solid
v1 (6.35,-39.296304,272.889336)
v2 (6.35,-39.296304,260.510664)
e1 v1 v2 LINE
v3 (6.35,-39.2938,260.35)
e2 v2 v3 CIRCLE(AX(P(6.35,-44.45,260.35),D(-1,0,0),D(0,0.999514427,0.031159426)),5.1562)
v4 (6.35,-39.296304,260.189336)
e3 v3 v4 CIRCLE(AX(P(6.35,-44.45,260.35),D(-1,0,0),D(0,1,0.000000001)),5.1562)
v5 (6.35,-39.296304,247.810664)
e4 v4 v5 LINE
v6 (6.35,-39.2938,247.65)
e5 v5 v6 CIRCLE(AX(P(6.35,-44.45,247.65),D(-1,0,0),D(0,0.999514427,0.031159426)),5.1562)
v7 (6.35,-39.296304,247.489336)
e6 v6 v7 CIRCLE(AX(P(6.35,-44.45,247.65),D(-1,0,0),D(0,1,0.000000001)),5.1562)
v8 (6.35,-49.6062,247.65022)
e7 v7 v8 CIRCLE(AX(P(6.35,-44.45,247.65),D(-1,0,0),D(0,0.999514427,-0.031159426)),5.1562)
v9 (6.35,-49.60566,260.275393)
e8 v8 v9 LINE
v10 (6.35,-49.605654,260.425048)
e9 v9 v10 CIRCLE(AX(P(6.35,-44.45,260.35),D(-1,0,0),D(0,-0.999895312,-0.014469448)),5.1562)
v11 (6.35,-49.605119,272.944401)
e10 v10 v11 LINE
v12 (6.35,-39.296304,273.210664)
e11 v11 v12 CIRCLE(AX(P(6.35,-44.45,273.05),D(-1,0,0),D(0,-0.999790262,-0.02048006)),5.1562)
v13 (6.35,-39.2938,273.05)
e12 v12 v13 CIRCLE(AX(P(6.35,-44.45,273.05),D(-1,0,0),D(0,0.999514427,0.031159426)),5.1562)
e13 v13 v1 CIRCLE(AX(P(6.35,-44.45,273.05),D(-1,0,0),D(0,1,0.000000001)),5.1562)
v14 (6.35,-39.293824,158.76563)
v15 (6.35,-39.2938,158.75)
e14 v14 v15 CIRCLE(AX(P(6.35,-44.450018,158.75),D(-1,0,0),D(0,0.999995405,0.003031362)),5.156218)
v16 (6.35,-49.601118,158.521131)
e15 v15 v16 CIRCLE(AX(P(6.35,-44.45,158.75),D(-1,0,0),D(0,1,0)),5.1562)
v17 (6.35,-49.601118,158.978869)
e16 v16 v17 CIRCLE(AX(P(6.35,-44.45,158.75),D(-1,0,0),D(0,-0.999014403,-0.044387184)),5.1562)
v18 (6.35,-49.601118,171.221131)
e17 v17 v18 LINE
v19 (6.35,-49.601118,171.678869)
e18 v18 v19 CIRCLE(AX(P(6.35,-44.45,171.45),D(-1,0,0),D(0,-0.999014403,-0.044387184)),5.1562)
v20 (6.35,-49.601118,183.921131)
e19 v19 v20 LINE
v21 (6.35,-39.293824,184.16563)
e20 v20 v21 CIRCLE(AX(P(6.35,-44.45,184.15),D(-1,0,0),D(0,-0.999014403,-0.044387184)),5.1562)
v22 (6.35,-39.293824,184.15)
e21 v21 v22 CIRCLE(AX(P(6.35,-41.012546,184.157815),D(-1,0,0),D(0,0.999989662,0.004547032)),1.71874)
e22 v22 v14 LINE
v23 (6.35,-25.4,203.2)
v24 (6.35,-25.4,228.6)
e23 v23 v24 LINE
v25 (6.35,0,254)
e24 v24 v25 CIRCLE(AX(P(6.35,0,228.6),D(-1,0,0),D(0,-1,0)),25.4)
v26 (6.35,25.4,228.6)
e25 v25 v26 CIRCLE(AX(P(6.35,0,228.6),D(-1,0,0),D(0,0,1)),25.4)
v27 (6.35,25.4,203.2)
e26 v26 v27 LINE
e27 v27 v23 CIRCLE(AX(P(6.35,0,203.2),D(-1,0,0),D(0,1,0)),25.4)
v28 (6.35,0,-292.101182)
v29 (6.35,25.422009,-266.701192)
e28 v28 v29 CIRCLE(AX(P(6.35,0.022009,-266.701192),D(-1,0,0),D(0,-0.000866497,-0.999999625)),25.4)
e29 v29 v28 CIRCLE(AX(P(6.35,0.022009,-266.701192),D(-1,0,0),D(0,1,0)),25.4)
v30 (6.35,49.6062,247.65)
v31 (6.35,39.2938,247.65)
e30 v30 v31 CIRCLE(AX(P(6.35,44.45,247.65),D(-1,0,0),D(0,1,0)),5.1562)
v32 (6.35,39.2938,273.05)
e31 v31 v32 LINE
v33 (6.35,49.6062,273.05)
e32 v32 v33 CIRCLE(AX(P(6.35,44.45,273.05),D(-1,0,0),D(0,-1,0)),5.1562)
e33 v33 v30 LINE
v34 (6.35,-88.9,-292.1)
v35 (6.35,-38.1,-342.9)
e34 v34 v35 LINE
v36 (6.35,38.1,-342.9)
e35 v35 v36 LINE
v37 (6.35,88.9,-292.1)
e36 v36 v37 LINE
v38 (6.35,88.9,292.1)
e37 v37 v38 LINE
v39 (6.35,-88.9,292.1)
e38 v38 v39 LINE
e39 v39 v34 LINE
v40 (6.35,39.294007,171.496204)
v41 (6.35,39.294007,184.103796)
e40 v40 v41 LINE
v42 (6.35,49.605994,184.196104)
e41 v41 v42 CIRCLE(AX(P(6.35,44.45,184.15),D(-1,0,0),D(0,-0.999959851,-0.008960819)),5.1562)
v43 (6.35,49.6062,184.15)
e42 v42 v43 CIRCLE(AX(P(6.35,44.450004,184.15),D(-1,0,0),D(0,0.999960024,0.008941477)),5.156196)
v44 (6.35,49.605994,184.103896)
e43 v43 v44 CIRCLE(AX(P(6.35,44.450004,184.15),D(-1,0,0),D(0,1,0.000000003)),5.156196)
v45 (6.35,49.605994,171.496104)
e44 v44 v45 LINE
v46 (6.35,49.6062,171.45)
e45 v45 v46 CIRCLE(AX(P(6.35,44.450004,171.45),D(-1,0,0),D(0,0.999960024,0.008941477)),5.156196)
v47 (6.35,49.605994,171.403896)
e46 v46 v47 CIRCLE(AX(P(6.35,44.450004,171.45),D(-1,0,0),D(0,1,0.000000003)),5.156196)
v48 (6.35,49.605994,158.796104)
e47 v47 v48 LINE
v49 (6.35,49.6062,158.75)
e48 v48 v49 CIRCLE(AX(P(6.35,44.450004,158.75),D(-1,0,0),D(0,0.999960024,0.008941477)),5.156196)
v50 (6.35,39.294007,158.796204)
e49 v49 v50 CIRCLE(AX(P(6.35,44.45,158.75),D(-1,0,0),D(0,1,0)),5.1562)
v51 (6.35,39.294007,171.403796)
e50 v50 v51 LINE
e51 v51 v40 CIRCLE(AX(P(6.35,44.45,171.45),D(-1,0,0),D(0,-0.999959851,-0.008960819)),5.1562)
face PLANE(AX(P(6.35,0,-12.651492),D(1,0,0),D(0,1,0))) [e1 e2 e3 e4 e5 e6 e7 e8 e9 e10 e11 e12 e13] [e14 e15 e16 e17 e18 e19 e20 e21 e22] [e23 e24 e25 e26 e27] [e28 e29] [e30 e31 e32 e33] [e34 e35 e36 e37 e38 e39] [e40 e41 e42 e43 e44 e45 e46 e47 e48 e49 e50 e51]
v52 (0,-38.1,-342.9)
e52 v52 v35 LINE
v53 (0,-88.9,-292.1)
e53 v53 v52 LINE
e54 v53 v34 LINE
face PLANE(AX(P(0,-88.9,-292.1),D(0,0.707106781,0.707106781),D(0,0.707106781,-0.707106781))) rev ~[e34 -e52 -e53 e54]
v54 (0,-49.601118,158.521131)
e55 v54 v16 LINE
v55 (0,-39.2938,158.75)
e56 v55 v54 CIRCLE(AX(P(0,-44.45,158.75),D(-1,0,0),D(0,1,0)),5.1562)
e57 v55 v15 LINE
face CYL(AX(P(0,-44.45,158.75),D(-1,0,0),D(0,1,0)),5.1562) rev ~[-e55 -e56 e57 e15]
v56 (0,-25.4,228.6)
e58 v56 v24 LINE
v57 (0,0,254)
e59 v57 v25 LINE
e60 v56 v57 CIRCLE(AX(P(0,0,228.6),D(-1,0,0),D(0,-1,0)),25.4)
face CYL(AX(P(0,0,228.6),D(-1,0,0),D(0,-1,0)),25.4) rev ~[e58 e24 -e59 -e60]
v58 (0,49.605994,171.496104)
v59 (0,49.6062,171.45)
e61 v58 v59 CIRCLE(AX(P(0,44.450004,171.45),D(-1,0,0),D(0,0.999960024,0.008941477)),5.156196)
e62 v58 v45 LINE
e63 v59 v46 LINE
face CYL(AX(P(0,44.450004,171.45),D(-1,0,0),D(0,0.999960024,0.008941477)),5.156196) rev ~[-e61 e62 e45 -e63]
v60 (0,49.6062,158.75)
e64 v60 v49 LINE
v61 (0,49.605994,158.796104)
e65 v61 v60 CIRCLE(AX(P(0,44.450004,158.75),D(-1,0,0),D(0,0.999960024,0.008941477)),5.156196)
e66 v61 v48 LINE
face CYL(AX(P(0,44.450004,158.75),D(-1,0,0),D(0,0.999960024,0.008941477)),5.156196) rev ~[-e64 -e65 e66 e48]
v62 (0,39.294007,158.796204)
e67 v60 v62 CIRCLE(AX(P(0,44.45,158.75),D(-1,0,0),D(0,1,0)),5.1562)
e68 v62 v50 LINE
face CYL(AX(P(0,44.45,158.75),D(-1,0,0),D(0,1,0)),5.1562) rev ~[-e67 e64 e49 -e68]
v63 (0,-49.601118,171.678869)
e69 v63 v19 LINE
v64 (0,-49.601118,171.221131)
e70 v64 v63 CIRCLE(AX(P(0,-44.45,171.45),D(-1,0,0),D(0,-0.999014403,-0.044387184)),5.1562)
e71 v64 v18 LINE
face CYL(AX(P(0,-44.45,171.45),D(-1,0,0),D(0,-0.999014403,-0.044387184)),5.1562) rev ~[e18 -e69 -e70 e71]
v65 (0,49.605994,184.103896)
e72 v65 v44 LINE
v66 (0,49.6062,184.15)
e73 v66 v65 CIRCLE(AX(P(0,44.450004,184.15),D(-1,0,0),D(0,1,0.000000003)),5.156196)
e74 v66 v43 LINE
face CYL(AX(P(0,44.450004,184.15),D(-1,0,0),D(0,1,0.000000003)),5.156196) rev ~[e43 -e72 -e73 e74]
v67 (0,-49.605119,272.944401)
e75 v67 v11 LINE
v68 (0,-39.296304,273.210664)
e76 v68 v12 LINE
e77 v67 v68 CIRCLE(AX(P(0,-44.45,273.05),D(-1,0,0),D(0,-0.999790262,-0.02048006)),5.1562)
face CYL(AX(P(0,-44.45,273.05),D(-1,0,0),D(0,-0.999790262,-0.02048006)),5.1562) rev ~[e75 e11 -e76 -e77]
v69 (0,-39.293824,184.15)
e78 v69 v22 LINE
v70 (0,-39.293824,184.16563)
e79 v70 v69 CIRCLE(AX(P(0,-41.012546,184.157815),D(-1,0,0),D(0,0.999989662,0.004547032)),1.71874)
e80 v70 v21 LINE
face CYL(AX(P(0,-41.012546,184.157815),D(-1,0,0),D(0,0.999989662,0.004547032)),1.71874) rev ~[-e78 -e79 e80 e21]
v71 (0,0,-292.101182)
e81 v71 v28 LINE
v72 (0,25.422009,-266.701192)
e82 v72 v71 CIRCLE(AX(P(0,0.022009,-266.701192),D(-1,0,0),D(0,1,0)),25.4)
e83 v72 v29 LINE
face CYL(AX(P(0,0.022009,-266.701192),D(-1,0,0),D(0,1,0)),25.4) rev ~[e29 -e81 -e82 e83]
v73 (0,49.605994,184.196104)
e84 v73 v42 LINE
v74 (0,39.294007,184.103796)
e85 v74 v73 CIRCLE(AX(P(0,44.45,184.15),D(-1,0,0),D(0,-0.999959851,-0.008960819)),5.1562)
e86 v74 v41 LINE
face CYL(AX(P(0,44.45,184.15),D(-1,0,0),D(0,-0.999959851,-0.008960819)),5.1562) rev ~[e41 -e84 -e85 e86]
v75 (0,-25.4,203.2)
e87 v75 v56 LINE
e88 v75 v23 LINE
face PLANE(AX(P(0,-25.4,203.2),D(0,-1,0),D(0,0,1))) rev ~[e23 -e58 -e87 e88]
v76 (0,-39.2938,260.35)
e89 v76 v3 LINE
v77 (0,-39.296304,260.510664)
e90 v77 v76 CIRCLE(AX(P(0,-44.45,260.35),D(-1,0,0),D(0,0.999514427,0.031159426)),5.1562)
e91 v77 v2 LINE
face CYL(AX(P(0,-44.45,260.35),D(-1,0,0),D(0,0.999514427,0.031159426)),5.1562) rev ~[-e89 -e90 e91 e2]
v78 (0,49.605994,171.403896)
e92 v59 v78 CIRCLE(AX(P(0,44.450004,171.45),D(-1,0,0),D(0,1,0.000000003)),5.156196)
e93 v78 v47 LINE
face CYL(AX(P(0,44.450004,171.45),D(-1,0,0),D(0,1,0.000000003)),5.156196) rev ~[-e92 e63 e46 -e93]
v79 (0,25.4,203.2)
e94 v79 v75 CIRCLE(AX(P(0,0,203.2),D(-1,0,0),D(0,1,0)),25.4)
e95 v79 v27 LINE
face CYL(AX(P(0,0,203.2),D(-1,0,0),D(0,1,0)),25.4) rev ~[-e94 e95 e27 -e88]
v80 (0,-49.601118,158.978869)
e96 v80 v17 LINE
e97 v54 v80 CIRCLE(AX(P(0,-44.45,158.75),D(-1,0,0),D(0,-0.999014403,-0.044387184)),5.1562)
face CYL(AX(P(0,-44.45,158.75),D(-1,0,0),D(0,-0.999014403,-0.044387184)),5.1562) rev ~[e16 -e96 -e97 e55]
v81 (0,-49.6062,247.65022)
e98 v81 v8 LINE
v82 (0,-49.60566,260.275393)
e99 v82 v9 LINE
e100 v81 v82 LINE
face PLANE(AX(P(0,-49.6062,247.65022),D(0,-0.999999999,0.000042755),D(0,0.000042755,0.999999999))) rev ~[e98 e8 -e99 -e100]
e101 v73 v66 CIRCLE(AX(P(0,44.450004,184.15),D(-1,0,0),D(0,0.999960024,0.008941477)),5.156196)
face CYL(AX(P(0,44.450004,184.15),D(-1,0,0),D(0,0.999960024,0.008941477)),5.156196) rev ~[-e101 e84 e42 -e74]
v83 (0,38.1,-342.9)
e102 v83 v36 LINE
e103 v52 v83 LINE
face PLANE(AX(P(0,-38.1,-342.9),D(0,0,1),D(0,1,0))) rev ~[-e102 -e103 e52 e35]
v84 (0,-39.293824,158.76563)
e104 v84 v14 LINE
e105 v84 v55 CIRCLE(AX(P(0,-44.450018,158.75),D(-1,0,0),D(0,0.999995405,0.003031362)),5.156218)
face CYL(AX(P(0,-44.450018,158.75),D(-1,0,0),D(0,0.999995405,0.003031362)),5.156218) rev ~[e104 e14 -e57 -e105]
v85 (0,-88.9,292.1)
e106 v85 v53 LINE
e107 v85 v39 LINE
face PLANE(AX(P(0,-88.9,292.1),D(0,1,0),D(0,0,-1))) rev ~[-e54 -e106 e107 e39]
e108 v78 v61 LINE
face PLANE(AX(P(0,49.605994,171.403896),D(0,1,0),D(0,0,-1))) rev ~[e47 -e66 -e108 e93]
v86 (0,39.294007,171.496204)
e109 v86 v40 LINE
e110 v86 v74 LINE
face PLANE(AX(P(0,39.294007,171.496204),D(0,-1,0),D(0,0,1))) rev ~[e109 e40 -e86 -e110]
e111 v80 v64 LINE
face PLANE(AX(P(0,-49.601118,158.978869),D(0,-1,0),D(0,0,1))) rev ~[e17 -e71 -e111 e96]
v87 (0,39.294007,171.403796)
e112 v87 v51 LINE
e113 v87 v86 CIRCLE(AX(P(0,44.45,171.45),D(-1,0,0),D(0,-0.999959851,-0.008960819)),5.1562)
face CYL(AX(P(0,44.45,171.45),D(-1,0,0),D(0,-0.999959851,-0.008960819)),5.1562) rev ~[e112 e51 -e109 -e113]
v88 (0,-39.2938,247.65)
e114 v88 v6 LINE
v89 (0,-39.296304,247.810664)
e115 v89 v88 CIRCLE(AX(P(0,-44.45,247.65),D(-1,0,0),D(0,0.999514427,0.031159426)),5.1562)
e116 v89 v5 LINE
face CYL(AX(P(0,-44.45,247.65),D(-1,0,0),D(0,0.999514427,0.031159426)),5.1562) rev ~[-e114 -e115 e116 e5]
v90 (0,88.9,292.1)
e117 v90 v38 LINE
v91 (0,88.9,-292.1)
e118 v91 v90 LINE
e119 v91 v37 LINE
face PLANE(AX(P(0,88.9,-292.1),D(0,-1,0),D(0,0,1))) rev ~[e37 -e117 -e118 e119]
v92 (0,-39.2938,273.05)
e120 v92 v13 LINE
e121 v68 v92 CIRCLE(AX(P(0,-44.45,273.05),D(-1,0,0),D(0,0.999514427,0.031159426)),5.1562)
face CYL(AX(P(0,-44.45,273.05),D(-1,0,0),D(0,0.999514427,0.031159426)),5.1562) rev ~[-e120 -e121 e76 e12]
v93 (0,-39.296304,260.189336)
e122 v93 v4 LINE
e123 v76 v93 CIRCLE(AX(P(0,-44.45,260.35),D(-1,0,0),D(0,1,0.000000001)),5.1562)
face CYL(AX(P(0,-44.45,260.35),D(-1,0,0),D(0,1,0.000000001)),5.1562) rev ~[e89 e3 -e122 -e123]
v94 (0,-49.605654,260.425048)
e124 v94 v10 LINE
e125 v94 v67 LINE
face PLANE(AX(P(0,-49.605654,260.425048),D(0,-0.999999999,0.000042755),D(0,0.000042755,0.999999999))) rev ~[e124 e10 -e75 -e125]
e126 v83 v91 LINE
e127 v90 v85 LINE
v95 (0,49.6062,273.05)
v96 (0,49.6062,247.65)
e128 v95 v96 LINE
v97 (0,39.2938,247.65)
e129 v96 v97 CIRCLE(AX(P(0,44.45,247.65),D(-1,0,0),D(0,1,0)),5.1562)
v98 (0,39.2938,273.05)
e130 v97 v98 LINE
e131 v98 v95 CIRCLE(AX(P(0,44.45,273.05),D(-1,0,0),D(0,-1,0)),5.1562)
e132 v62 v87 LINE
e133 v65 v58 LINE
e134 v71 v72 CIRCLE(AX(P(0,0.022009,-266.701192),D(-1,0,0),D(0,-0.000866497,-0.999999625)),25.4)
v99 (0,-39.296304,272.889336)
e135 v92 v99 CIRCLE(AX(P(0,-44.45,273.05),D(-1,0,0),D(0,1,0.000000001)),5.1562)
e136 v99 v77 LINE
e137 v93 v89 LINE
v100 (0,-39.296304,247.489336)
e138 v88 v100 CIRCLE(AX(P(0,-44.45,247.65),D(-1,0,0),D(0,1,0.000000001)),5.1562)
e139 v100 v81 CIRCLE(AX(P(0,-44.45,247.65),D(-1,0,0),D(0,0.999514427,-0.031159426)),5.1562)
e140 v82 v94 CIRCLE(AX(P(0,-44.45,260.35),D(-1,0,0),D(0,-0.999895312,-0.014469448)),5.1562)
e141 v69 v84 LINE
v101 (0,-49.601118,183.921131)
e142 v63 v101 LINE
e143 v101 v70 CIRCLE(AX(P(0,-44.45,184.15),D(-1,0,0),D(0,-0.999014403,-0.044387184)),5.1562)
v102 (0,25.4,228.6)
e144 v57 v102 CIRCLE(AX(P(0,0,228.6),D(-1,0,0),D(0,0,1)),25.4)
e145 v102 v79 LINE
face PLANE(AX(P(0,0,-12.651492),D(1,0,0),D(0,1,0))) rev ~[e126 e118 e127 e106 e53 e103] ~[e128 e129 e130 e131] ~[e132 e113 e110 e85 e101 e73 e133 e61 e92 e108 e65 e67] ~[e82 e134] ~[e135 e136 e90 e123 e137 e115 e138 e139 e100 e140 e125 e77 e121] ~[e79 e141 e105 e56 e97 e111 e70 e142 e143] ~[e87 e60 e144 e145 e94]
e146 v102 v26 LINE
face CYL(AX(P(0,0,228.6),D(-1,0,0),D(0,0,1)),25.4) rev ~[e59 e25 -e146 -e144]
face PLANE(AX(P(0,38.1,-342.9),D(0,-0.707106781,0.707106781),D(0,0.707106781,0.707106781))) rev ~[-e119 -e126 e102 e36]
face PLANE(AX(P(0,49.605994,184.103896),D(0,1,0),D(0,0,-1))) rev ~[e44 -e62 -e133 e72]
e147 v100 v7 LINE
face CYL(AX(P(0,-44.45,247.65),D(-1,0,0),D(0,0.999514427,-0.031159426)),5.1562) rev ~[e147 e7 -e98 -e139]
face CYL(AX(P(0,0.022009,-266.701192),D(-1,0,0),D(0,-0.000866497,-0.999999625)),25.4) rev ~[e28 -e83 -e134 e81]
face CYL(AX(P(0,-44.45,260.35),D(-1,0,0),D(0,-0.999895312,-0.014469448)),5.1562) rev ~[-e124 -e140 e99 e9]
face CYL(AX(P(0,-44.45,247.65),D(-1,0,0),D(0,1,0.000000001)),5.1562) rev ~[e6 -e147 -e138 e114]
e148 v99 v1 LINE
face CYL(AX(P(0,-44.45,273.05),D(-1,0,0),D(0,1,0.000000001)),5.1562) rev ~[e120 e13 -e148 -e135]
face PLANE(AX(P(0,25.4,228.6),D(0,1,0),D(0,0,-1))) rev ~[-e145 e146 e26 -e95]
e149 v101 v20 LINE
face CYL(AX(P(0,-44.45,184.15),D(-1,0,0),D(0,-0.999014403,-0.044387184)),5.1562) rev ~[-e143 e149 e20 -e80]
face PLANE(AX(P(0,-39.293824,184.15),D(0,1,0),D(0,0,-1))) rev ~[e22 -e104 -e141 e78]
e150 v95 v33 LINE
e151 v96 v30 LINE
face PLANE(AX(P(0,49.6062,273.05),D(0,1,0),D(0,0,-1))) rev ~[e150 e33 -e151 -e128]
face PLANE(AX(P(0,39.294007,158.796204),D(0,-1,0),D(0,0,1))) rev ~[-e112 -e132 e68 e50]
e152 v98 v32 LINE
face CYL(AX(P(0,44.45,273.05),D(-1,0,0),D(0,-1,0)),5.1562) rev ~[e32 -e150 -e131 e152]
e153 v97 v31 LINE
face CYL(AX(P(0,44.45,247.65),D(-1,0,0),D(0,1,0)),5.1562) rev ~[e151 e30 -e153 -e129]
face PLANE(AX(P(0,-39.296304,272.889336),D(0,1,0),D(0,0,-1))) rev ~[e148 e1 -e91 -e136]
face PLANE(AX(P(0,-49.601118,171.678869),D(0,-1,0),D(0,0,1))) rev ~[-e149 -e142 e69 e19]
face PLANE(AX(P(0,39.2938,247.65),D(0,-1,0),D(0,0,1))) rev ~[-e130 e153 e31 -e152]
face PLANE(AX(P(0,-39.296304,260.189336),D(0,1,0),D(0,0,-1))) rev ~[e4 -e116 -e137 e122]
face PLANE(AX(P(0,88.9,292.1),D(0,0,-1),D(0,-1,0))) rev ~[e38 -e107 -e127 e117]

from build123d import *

# Parameters (mm, degrees)
F1_DEPTH = 6.35


# Not quite as in the source:
# - ends of sketch curves that miss each other by under 0.0002 mm in the source are joined


with BuildPart() as f1:
    # F0 (on Right) → F1 (new body)
    with BuildSketch(Plane.YZ):
        Polygon((0, 292.1), (-88.9, 292.1), (-88.9, -292.1), (-38.1, -342.9), (0, -342.9), (38.1, -342.9), (88.9, -292.1), (88.9, 292.1), align=None)
        with BuildLine():
            ThreePointArc((25.4220090151, -266.7011916637), (17.974738209, -284.6694835829), (0, -292.1011821284))
            ThreePointArc((0, -292.1011821284), (-17.9307201788, -248.7328997446), (25.4220090151, -266.7011916637))
        make_face(mode=Mode.SUBTRACT)
        with BuildLine():
            Line((-39.2938236907, 184.15), (-39.2938236907, 171.45))
            Line((-39.2938236907, 171.45), (-39.2938236907, 158.7656303343))
            ThreePointArc((-39.2938236907, 158.7656303343), (-39.2938059227, 158.7578151761), (-39.2938, 158.75))
            ThreePointArc((-39.2938, 158.75), (-44.3355371946, 153.59507064), (-49.6011180661, 158.5211308033))
            ThreePointArc((-49.6011180661, 158.5211308033), (-49.6062, 158.75), (-49.6011180661, 158.9788691967))
            Line((-49.6011180661, 158.9788691967), (-49.6011180661, 171.2211308033))
            ThreePointArc((-49.6011180661, 171.2211308033), (-49.6062, 171.45), (-49.6011180661, 171.6788691967))
            Line((-49.6011180661, 171.6788691967), (-49.6011180661, 183.9211308033))
            ThreePointArc((-49.6011180661, 183.9211308033), (-44.5722759242, 189.3047499492), (-39.2938236907, 184.1656303343))
            ThreePointArc((-39.2938236907, 184.1656303343), (-39.2938059227, 184.1578151761), (-39.2938236907, 184.15))
        make_face(mode=Mode.SUBTRACT)
        with BuildLine():
            ThreePointArc((-39.2963037105, 260.5106642339), (-39.2944259656, 260.4303418705), (-39.2938, 260.35))
            ThreePointArc((-39.2938, 260.35), (-39.2944259656, 260.2696581295), (-39.2963037105, 260.1893357661))
            Line((-39.2963037105, 260.1893357661), (-39.2963037105, 247.8106642339))
            ThreePointArc((-39.2963037105, 247.8106642339), (-39.2944259656, 247.7303418705), (-39.2938, 247.65))
            ThreePointArc((-39.2938, 247.65), (-39.2944259656, 247.5696581295), (-39.2963037105, 247.4893357661))
            ThreePointArc((-39.2963037105, 247.4893357661), (-44.5304520833, 242.4944276843), (-49.6061999953, 247.6502204525))
            Line((-49.6061999953, 247.6502204525), (-49.6056602081, 260.2753926376))
            ThreePointArc((-49.6056602081, 260.2753926376), (-49.6061999953, 260.3502204525), (-49.6056538096, 260.4250482209))
            Line((-49.6056538096, 260.4250482209), (-49.6051185467, 272.9444007144))
            ThreePointArc((-49.6051185467, 272.9444007144), (-44.583133659, 278.2044809505), (-39.2963037105, 273.2106642339))
            ThreePointArc((-39.2963037105, 273.2106642339), (-39.2944259656, 273.1303418705), (-39.2938, 273.05))
            ThreePointArc((-39.2938, 273.05), (-39.2944259656, 272.9696581295), (-39.2963037105, 272.8893357661))
            Line((-39.2963037105, 272.8893357661), (-39.2963037105, 260.5106642339))
        make_face(mode=Mode.SUBTRACT)
        with BuildLine():
            ThreePointArc((-25.4, 228.6), (-17.9605122421, 246.5605122421), (0, 254))
            ThreePointArc((0, 254), (17.9605122421, 246.5605122421), (25.4, 228.6))
            Line((25.4, 228.6), (25.4, 203.2))
            ThreePointArc((25.4, 203.2), (0, 177.8), (-25.4, 203.2))
            Line((-25.4, 203.2), (-25.4, 228.6))
        make_face(mode=Mode.SUBTRACT)
        with BuildLine():
            ThreePointArc((49.6059938769, 171.496104026), (49.606148469, 171.4730522434), (49.6062, 171.45))
            ThreePointArc((49.6062, 171.45), (49.606148469, 171.4269477566), (49.6059938769, 171.403895974))
            Line((49.6059938769, 171.403895974), (49.6059938769, 158.796104026))
            ThreePointArc((49.6059938769, 158.796104026), (49.606148469, 158.7730522434), (49.6062, 158.75))
            ThreePointArc((49.6062, 158.75), (44.4268978801, 153.5938517543), (39.294007016, 158.7962037759))
            Line((39.294007016, 158.7962037759), (39.294007016, 171.4037962241))
            ThreePointArc((39.294007016, 171.4037962241), (39.2938, 171.45), (39.294007016, 171.4962037759))
            Line((39.294007016, 171.4962037759), (39.294007016, 184.1037962241))
            ThreePointArc((39.294007016, 184.1037962241), (44.403846099, 189.3059934307), (49.6059938769, 184.196104026))
            ThreePointArc((49.6059938769, 184.196104026), (49.606148469, 184.1730522434), (49.6062, 184.15))
            ThreePointArc((49.6062, 184.15), (49.606148469, 184.1269477566), (49.6059938769, 184.103895974))
            Line((49.6059938769, 184.103895974), (49.6059938769, 171.496104026))
        make_face(mode=Mode.SUBTRACT)
        with BuildLine():
            ThreePointArc((39.2938, 273.05), (44.45, 278.2062), (49.6062, 273.05))
            Line((49.6062, 273.05), (49.6062, 260.35))
            Line((49.6062, 260.35), (49.6062, 247.65))
            ThreePointArc((49.6062, 247.65), (44.45, 242.4938), (39.2938, 247.65))
            Line((39.2938, 247.65), (39.2938, 260.35))
            Line((39.2938, 260.35), (39.2938, 273.05))
        make_face(mode=Mode.SUBTRACT)
    extrude(amount=F1_DEPTH)


solid = f1.part
